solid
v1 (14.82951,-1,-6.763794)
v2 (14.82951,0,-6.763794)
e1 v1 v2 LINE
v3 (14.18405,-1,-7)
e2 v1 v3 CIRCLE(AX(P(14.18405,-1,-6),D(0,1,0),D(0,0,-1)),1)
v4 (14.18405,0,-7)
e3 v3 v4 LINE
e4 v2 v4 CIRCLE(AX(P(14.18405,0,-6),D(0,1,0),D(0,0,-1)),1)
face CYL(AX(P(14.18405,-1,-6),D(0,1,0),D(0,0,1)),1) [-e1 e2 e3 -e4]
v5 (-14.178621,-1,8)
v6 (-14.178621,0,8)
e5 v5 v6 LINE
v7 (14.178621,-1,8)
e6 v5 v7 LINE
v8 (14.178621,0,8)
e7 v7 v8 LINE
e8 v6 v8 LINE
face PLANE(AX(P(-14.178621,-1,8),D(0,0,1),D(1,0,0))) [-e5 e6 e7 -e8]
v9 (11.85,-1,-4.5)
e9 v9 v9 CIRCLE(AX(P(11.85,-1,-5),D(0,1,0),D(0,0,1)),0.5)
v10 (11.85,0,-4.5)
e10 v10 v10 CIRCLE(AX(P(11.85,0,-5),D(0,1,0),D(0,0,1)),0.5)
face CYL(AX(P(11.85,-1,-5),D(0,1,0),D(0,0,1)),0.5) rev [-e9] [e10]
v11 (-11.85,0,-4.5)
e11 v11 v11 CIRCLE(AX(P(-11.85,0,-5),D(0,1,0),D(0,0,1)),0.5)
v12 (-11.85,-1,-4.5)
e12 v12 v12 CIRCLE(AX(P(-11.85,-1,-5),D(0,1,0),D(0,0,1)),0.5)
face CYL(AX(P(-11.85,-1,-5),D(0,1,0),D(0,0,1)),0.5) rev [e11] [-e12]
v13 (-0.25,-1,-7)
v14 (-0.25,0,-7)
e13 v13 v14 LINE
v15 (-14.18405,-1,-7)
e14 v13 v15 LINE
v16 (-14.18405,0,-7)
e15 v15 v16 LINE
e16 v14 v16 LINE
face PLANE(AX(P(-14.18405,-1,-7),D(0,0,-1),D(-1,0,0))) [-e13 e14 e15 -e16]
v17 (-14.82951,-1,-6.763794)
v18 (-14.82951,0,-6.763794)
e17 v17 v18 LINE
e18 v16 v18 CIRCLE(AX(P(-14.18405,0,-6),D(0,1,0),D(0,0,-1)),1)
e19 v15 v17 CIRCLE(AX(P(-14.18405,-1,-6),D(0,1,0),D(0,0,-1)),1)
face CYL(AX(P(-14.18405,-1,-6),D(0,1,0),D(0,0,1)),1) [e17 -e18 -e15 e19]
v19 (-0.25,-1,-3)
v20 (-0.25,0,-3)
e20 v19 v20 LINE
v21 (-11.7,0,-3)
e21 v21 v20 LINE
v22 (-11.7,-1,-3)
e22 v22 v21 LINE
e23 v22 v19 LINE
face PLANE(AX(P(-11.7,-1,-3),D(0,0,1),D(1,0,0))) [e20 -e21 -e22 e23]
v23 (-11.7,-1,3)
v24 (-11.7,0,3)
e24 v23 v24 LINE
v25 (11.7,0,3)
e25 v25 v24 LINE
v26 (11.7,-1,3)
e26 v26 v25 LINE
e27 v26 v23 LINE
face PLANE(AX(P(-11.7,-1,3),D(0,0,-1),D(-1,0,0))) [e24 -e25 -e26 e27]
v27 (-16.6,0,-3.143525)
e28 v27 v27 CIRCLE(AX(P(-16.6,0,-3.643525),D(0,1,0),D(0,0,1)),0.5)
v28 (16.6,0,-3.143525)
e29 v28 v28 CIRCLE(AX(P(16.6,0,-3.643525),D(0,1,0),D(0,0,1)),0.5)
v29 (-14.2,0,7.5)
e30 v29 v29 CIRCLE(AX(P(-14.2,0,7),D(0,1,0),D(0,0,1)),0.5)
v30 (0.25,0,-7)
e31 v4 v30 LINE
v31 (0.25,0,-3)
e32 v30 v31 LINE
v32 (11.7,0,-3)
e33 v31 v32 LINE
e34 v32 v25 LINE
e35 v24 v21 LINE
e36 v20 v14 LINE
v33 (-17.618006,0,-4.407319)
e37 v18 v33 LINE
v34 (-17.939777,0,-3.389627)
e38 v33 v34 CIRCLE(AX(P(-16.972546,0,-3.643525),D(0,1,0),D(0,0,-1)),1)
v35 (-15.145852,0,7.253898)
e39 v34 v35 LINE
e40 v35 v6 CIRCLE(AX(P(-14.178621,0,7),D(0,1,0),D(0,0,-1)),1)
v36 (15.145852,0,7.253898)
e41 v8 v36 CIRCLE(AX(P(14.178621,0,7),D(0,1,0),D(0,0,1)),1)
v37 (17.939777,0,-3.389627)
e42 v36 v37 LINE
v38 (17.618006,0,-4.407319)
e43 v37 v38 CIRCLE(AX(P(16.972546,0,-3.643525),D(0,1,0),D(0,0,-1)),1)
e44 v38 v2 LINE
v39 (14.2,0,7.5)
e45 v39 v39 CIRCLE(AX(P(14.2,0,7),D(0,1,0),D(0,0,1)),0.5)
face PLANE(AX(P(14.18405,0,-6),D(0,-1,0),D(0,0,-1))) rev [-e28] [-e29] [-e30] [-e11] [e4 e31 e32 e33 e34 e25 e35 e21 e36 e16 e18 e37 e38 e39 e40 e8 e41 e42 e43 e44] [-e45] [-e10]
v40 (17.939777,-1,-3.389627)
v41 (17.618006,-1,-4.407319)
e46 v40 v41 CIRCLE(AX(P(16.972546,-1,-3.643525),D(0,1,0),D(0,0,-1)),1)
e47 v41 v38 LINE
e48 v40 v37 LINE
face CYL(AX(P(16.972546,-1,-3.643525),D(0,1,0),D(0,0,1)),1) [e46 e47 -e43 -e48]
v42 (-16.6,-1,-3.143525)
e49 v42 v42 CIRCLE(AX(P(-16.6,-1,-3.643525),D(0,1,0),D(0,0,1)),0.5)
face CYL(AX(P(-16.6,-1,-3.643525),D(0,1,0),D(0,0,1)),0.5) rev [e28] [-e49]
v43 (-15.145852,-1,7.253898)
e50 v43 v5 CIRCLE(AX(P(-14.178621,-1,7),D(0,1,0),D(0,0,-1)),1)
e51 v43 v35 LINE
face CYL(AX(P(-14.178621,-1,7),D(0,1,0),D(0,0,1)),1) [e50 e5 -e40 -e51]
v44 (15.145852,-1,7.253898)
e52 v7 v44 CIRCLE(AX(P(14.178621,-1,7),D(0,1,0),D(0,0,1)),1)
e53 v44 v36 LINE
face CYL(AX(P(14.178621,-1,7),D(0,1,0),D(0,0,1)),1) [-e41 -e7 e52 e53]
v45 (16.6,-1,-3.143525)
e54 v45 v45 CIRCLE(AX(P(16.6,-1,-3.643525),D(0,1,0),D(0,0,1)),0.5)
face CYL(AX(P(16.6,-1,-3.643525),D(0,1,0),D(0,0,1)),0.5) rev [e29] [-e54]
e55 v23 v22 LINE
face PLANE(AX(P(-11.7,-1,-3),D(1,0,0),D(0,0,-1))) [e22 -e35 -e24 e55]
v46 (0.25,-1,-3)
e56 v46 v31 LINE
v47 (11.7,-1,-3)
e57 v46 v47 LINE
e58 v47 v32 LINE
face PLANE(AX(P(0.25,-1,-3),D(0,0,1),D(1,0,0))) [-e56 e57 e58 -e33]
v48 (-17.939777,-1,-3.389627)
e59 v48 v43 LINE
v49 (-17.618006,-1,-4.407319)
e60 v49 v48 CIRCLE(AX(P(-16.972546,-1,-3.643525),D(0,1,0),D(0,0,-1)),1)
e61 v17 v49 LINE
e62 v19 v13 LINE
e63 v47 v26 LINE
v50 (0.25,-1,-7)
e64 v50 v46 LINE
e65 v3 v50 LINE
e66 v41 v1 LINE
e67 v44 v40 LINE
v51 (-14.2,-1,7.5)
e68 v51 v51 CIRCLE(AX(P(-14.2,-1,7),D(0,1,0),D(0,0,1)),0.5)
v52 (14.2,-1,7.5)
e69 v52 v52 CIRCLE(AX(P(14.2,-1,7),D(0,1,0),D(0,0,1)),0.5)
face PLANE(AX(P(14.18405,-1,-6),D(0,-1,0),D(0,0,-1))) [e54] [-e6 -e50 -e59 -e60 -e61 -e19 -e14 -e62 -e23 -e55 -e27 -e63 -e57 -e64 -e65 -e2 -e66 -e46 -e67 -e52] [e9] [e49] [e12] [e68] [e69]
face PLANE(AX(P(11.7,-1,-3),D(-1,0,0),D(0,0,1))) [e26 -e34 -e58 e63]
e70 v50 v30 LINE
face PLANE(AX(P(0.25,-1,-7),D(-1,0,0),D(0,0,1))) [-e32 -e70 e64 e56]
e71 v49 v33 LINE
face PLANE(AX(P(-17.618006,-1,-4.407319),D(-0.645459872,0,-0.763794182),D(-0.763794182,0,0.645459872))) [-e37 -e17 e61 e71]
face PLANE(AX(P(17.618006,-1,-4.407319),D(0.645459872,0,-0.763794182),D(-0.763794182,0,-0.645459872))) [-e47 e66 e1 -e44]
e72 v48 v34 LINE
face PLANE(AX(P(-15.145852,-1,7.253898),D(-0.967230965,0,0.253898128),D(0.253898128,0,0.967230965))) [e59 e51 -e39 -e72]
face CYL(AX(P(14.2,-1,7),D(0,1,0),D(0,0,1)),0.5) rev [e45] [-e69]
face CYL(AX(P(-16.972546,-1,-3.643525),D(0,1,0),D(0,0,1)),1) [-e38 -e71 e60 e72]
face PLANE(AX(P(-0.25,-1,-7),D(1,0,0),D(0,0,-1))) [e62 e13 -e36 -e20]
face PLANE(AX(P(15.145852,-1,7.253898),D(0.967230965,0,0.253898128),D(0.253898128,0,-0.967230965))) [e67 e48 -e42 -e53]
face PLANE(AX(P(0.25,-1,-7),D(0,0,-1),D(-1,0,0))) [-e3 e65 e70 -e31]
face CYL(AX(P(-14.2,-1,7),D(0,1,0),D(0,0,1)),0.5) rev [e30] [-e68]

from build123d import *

# Parameters (mm, degrees)
SKETCH1_R          = 0.5
BASE_FLANGE1_DEPTH = 1


# Sheet-metal steps are written as plain solids
with BuildPart() as part:
    # Sketch1 → Base-Flange1 (new body)
    with BuildSketch(Plane(origin=(0, 0, 0), x_dir=(1, 0, 0), z_dir=(0, 1, 0))):
        with BuildLine():
            Line((-14.178620776, -8), (14.178620776, -8))
            ThreePointArc((14.178620776, -8), (14.789399734, -7.791801152), (15.145851741, -7.253898128))
            Line((15.145851741, -7.253898128), (17.939776994, 3.389626646))
            ThreePointArc((17.939776994, 3.389626646), (17.926022481, 3.944992277), (17.618005902, 4.407318956))
            Line((17.618005902, 4.407318956), (14.829510217, 6.763794182))
            ThreePointArc((14.829510217, 6.763794182), (14.527711383, 6.939093761), (14.184050345, 7))
            Line((14.184050345, 7), (0.25, 7))
            Line((0.25, 7), (0.25, 3))
            Line((0.25, 3), (11.7, 3))
            Line((11.7, 3), (11.7, -3))
            Line((11.7, -3), (-11.7, -3))
            Line((-11.7, -3), (-11.7, 3))
            Line((-11.7, 3), (-0.25, 3))
            Line((-0.25, 3), (-0.25, 7))
            Line((-0.25, 7), (-14.184050345, 7))
            ThreePointArc((-14.184050345, 7), (-14.527711383, 6.939093761), (-14.829510217, 6.763794182))
            Line((-14.829510217, 6.763794182), (-17.618005902, 4.407318956))
            ThreePointArc((-17.618005902, 4.407318956), (-17.926022481, 3.944992277), (-17.939776994, 3.389626646))
            Line((-17.939776994, 3.389626646), (-15.145851741, -7.253898128))
            ThreePointArc((-15.145851741, -7.253898128), (-14.789399734, -7.791801152), (-14.178620776, -8))
        make_face()
        with Locations(Location((-14.2, -7, 0), (0, 0, 270))):
            Circle(SKETCH1_R, mode=Mode.SUBTRACT)
        with Locations(Location((14.2, -7, 0), (0, 0, 270))):
            Circle(SKETCH1_R, mode=Mode.SUBTRACT)
        with Locations(Location((-16.6, 3.643524774, 0), (0, 0, 270))):
            Circle(SKETCH1_R, mode=Mode.SUBTRACT)
        with Locations(Location((16.6, 3.643524774, 0), (0, 0, 270))):
            Circle(SKETCH1_R, mode=Mode.SUBTRACT)
        with Locations(Location((-11.85, 5, 0), (0, 0, 270))):
            Circle(SKETCH1_R, mode=Mode.SUBTRACT)
        with Locations(Location((11.85, 5, 0), (0, 0, 270))):
            Circle(SKETCH1_R, mode=Mode.SUBTRACT)
    extrude(amount=-BASE_FLANGE1_DEPTH)


solid = part.part
